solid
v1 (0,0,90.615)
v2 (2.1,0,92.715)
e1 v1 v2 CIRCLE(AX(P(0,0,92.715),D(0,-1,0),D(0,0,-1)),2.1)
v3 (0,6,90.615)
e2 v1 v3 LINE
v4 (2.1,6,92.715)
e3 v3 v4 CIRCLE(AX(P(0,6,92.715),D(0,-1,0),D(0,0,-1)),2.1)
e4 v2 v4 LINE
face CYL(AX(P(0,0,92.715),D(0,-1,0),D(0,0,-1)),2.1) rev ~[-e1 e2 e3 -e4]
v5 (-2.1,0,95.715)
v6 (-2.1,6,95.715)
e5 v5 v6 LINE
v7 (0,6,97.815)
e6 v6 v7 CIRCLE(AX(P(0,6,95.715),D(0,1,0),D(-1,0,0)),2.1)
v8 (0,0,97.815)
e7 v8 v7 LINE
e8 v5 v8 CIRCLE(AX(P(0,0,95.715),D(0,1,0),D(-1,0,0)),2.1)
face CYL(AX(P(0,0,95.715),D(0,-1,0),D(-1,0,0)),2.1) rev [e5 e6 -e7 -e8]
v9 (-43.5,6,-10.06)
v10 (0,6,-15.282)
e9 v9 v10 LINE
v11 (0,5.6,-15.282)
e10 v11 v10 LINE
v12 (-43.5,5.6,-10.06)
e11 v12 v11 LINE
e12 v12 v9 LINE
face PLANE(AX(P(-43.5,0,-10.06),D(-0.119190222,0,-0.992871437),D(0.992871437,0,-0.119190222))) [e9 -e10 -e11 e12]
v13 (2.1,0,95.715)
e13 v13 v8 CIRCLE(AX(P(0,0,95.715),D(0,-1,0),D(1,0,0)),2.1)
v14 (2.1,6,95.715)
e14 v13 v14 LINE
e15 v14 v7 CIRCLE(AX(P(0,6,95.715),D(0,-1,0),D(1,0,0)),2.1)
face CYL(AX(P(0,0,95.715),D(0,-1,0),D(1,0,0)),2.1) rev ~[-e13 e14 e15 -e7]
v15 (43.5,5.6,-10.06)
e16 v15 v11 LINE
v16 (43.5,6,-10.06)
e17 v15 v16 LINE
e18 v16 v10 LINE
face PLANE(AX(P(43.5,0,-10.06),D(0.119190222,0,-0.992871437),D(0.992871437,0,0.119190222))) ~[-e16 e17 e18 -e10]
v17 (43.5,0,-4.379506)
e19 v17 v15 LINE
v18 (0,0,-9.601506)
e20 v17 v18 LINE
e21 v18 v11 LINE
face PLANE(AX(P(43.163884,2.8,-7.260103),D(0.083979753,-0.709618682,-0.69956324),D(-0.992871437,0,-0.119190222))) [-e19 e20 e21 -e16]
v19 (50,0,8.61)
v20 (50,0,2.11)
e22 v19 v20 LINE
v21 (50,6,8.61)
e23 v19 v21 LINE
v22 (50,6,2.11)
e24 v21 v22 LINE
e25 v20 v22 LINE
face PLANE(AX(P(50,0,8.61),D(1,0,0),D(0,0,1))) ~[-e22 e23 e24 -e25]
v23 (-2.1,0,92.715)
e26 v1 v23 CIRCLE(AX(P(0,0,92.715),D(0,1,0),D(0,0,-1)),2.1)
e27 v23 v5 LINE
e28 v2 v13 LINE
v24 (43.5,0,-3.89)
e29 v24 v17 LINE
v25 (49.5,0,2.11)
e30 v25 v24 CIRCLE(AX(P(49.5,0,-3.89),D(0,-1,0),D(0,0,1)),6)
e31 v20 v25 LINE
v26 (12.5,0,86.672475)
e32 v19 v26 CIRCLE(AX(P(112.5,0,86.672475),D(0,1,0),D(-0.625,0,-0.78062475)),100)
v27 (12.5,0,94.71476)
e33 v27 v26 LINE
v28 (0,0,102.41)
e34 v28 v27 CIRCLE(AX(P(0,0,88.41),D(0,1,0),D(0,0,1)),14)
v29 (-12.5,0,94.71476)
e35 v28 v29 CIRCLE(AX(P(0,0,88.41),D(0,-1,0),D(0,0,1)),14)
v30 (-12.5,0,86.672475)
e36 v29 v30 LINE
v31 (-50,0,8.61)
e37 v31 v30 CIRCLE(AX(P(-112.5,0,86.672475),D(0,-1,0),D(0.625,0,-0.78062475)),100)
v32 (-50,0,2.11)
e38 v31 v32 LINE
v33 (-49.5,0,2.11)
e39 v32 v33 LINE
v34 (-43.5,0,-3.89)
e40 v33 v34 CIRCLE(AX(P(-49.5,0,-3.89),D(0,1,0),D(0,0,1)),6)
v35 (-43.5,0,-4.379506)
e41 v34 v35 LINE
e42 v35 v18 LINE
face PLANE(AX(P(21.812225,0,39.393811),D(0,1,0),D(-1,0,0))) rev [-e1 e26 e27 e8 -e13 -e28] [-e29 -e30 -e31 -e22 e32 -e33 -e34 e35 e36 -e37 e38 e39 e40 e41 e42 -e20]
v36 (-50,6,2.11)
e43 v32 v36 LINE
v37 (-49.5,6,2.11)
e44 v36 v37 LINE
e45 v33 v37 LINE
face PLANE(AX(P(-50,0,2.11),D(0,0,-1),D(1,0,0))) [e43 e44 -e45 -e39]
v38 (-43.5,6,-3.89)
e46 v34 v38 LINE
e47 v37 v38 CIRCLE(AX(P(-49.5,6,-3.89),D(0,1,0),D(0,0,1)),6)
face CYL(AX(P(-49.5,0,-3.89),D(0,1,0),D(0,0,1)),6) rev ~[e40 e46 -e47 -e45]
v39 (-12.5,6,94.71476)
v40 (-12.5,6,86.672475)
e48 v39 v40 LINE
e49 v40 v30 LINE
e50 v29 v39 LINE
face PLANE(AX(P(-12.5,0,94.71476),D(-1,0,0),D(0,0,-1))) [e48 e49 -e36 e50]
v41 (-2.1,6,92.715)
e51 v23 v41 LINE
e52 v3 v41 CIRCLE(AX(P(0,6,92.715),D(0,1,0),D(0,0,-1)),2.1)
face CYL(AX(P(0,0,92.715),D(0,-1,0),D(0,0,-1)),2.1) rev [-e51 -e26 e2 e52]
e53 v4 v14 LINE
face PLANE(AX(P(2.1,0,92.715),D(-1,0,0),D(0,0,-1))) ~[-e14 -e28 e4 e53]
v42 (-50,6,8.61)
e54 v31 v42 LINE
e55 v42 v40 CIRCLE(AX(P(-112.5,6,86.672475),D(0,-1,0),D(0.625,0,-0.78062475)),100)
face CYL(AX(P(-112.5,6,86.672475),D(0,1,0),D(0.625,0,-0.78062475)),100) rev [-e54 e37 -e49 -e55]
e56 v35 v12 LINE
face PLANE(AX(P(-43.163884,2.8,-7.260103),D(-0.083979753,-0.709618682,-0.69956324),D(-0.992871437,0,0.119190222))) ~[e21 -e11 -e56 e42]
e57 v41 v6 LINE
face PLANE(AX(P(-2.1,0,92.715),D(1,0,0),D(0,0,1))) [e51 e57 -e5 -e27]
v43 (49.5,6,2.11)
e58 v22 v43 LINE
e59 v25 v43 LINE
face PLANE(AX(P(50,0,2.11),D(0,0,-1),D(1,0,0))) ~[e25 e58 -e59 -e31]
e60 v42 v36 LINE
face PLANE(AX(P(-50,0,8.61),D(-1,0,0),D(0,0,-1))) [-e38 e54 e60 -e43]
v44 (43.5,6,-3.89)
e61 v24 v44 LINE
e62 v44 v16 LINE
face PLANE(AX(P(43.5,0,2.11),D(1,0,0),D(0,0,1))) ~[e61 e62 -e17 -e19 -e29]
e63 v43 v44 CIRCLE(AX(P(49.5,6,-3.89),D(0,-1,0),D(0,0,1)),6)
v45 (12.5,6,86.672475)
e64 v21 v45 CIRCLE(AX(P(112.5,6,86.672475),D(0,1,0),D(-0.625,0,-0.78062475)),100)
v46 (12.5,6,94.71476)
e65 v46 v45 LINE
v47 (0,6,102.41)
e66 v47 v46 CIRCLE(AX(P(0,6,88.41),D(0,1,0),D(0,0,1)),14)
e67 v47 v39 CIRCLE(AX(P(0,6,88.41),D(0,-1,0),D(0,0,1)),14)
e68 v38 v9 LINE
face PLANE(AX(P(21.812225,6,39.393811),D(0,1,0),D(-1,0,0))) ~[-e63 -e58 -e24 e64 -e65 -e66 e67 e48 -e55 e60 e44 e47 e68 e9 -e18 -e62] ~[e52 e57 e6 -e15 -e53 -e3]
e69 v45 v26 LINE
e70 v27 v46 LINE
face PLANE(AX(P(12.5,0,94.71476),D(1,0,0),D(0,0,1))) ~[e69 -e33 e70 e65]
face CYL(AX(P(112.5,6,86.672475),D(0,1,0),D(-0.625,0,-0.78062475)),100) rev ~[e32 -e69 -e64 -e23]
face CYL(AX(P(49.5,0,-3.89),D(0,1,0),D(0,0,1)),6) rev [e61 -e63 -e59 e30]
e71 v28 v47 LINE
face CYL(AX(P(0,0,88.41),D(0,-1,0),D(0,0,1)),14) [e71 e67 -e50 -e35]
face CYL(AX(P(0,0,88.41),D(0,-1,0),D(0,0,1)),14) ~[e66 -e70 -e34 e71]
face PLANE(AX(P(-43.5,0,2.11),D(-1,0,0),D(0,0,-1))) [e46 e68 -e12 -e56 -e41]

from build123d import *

# Parameters (mm, degrees)
F1_DEPTH    = 6
F2_R        = 6
F3_SIZE2    = 5.6
F3_SIZE     = 5.64
F4_T1_DEPTH = 6


# Not quite as in the source:
# - a fillet or chamfer that OpenCascade refuses, or shapes differently, is made with other operations: its cross-section is extruded or revolved along the edge and cut away or added


with BuildPart() as f1:
    # F0 (on Front) → F1 (new body)
    with BuildSketch(Plane.XZ):
        with BuildLine():
            Line((-43.5, -10.06), (0, -15.282))
            Line((0, -15.282), (0, 74.41))
            ThreePointArc((0, 74.41), (-7.3393922947, 76.4880320104), (-12.5, 82.1052398935))
            Line((-12.5, 82.1052398935), (-12.5, 8.61))
            Line((-12.5, 8.61), (-50, 8.61))
            Line((-50, 8.61), (-50, 2.11))
            Line((-50, 2.11), (-43.5, 2.11))
            Line((-43.5, 2.11), (-43.5, -10.06))
        make_face()
        with BuildLine():
            ThreePointArc((-12.5, 82.1052398935), (-7.3393922947, 76.4880320104), (0, 74.41))
            Line((0, 74.41), (0, 90.615))
            ThreePointArc((0, 90.615), (-1.4849242405, 91.2300757595), (-2.1, 92.715))
            Line((-2.1, 92.715), (-2.1, 95.715))
            ThreePointArc((-2.1, 95.715), (-1.4849242405, 97.1999242405), (0, 97.815))
            Line((0, 97.815), (0, 102.41))
            ThreePointArc((0, 102.41), (-7.3393922947, 100.3319679896), (-12.5, 94.7147601065))
            Line((-12.5, 94.7147601065), (-12.5, 82.1052398935))
        make_face()
    extrude(amount=-F1_DEPTH)

    # F2
    f2_edges = [f1.edges().sort_by_distance(p)[0] for p in [
        (-43.5, 3, 2.11),
    ]]
    fillet(f2_edges, radius=F2_R)

    # F3
    f3_edges = [f1.edges().sort_by_distance(p)[0] for p in [
        (-21.75, 0, -12.671),
    ]]
    f3_side = f1.faces().sort_by_distance((-42.221274, 0, -6.975))[0]
    chamfer(f3_edges, length=F3_SIZE, length2=F3_SIZE2, reference=f3_side)

    # F4: fillet of radius 100 on 1 edges, made by hand

    # F4_s2 → F4_t1 (join)
    with BuildSketch(Plane.XZ.offset(-6)):
        with BuildLine():
            ThreePointArc((-50, 8.61), (-22.3612181134, 43.3712047908), (-12.5, 86.67247498))
            Line((-12.5, 86.67247498), (-12.5, 8.61))
            Line((-12.5, 8.61), (-50, 8.61))
        make_face()
    extrude(amount=F4_T1_DEPTH)

    # F5: F1 across plane


with BuildPart() as f1_1:
    add(f1.part)
    add(f1.part.mirror(Plane.YZ))


solid = f1_1.part
